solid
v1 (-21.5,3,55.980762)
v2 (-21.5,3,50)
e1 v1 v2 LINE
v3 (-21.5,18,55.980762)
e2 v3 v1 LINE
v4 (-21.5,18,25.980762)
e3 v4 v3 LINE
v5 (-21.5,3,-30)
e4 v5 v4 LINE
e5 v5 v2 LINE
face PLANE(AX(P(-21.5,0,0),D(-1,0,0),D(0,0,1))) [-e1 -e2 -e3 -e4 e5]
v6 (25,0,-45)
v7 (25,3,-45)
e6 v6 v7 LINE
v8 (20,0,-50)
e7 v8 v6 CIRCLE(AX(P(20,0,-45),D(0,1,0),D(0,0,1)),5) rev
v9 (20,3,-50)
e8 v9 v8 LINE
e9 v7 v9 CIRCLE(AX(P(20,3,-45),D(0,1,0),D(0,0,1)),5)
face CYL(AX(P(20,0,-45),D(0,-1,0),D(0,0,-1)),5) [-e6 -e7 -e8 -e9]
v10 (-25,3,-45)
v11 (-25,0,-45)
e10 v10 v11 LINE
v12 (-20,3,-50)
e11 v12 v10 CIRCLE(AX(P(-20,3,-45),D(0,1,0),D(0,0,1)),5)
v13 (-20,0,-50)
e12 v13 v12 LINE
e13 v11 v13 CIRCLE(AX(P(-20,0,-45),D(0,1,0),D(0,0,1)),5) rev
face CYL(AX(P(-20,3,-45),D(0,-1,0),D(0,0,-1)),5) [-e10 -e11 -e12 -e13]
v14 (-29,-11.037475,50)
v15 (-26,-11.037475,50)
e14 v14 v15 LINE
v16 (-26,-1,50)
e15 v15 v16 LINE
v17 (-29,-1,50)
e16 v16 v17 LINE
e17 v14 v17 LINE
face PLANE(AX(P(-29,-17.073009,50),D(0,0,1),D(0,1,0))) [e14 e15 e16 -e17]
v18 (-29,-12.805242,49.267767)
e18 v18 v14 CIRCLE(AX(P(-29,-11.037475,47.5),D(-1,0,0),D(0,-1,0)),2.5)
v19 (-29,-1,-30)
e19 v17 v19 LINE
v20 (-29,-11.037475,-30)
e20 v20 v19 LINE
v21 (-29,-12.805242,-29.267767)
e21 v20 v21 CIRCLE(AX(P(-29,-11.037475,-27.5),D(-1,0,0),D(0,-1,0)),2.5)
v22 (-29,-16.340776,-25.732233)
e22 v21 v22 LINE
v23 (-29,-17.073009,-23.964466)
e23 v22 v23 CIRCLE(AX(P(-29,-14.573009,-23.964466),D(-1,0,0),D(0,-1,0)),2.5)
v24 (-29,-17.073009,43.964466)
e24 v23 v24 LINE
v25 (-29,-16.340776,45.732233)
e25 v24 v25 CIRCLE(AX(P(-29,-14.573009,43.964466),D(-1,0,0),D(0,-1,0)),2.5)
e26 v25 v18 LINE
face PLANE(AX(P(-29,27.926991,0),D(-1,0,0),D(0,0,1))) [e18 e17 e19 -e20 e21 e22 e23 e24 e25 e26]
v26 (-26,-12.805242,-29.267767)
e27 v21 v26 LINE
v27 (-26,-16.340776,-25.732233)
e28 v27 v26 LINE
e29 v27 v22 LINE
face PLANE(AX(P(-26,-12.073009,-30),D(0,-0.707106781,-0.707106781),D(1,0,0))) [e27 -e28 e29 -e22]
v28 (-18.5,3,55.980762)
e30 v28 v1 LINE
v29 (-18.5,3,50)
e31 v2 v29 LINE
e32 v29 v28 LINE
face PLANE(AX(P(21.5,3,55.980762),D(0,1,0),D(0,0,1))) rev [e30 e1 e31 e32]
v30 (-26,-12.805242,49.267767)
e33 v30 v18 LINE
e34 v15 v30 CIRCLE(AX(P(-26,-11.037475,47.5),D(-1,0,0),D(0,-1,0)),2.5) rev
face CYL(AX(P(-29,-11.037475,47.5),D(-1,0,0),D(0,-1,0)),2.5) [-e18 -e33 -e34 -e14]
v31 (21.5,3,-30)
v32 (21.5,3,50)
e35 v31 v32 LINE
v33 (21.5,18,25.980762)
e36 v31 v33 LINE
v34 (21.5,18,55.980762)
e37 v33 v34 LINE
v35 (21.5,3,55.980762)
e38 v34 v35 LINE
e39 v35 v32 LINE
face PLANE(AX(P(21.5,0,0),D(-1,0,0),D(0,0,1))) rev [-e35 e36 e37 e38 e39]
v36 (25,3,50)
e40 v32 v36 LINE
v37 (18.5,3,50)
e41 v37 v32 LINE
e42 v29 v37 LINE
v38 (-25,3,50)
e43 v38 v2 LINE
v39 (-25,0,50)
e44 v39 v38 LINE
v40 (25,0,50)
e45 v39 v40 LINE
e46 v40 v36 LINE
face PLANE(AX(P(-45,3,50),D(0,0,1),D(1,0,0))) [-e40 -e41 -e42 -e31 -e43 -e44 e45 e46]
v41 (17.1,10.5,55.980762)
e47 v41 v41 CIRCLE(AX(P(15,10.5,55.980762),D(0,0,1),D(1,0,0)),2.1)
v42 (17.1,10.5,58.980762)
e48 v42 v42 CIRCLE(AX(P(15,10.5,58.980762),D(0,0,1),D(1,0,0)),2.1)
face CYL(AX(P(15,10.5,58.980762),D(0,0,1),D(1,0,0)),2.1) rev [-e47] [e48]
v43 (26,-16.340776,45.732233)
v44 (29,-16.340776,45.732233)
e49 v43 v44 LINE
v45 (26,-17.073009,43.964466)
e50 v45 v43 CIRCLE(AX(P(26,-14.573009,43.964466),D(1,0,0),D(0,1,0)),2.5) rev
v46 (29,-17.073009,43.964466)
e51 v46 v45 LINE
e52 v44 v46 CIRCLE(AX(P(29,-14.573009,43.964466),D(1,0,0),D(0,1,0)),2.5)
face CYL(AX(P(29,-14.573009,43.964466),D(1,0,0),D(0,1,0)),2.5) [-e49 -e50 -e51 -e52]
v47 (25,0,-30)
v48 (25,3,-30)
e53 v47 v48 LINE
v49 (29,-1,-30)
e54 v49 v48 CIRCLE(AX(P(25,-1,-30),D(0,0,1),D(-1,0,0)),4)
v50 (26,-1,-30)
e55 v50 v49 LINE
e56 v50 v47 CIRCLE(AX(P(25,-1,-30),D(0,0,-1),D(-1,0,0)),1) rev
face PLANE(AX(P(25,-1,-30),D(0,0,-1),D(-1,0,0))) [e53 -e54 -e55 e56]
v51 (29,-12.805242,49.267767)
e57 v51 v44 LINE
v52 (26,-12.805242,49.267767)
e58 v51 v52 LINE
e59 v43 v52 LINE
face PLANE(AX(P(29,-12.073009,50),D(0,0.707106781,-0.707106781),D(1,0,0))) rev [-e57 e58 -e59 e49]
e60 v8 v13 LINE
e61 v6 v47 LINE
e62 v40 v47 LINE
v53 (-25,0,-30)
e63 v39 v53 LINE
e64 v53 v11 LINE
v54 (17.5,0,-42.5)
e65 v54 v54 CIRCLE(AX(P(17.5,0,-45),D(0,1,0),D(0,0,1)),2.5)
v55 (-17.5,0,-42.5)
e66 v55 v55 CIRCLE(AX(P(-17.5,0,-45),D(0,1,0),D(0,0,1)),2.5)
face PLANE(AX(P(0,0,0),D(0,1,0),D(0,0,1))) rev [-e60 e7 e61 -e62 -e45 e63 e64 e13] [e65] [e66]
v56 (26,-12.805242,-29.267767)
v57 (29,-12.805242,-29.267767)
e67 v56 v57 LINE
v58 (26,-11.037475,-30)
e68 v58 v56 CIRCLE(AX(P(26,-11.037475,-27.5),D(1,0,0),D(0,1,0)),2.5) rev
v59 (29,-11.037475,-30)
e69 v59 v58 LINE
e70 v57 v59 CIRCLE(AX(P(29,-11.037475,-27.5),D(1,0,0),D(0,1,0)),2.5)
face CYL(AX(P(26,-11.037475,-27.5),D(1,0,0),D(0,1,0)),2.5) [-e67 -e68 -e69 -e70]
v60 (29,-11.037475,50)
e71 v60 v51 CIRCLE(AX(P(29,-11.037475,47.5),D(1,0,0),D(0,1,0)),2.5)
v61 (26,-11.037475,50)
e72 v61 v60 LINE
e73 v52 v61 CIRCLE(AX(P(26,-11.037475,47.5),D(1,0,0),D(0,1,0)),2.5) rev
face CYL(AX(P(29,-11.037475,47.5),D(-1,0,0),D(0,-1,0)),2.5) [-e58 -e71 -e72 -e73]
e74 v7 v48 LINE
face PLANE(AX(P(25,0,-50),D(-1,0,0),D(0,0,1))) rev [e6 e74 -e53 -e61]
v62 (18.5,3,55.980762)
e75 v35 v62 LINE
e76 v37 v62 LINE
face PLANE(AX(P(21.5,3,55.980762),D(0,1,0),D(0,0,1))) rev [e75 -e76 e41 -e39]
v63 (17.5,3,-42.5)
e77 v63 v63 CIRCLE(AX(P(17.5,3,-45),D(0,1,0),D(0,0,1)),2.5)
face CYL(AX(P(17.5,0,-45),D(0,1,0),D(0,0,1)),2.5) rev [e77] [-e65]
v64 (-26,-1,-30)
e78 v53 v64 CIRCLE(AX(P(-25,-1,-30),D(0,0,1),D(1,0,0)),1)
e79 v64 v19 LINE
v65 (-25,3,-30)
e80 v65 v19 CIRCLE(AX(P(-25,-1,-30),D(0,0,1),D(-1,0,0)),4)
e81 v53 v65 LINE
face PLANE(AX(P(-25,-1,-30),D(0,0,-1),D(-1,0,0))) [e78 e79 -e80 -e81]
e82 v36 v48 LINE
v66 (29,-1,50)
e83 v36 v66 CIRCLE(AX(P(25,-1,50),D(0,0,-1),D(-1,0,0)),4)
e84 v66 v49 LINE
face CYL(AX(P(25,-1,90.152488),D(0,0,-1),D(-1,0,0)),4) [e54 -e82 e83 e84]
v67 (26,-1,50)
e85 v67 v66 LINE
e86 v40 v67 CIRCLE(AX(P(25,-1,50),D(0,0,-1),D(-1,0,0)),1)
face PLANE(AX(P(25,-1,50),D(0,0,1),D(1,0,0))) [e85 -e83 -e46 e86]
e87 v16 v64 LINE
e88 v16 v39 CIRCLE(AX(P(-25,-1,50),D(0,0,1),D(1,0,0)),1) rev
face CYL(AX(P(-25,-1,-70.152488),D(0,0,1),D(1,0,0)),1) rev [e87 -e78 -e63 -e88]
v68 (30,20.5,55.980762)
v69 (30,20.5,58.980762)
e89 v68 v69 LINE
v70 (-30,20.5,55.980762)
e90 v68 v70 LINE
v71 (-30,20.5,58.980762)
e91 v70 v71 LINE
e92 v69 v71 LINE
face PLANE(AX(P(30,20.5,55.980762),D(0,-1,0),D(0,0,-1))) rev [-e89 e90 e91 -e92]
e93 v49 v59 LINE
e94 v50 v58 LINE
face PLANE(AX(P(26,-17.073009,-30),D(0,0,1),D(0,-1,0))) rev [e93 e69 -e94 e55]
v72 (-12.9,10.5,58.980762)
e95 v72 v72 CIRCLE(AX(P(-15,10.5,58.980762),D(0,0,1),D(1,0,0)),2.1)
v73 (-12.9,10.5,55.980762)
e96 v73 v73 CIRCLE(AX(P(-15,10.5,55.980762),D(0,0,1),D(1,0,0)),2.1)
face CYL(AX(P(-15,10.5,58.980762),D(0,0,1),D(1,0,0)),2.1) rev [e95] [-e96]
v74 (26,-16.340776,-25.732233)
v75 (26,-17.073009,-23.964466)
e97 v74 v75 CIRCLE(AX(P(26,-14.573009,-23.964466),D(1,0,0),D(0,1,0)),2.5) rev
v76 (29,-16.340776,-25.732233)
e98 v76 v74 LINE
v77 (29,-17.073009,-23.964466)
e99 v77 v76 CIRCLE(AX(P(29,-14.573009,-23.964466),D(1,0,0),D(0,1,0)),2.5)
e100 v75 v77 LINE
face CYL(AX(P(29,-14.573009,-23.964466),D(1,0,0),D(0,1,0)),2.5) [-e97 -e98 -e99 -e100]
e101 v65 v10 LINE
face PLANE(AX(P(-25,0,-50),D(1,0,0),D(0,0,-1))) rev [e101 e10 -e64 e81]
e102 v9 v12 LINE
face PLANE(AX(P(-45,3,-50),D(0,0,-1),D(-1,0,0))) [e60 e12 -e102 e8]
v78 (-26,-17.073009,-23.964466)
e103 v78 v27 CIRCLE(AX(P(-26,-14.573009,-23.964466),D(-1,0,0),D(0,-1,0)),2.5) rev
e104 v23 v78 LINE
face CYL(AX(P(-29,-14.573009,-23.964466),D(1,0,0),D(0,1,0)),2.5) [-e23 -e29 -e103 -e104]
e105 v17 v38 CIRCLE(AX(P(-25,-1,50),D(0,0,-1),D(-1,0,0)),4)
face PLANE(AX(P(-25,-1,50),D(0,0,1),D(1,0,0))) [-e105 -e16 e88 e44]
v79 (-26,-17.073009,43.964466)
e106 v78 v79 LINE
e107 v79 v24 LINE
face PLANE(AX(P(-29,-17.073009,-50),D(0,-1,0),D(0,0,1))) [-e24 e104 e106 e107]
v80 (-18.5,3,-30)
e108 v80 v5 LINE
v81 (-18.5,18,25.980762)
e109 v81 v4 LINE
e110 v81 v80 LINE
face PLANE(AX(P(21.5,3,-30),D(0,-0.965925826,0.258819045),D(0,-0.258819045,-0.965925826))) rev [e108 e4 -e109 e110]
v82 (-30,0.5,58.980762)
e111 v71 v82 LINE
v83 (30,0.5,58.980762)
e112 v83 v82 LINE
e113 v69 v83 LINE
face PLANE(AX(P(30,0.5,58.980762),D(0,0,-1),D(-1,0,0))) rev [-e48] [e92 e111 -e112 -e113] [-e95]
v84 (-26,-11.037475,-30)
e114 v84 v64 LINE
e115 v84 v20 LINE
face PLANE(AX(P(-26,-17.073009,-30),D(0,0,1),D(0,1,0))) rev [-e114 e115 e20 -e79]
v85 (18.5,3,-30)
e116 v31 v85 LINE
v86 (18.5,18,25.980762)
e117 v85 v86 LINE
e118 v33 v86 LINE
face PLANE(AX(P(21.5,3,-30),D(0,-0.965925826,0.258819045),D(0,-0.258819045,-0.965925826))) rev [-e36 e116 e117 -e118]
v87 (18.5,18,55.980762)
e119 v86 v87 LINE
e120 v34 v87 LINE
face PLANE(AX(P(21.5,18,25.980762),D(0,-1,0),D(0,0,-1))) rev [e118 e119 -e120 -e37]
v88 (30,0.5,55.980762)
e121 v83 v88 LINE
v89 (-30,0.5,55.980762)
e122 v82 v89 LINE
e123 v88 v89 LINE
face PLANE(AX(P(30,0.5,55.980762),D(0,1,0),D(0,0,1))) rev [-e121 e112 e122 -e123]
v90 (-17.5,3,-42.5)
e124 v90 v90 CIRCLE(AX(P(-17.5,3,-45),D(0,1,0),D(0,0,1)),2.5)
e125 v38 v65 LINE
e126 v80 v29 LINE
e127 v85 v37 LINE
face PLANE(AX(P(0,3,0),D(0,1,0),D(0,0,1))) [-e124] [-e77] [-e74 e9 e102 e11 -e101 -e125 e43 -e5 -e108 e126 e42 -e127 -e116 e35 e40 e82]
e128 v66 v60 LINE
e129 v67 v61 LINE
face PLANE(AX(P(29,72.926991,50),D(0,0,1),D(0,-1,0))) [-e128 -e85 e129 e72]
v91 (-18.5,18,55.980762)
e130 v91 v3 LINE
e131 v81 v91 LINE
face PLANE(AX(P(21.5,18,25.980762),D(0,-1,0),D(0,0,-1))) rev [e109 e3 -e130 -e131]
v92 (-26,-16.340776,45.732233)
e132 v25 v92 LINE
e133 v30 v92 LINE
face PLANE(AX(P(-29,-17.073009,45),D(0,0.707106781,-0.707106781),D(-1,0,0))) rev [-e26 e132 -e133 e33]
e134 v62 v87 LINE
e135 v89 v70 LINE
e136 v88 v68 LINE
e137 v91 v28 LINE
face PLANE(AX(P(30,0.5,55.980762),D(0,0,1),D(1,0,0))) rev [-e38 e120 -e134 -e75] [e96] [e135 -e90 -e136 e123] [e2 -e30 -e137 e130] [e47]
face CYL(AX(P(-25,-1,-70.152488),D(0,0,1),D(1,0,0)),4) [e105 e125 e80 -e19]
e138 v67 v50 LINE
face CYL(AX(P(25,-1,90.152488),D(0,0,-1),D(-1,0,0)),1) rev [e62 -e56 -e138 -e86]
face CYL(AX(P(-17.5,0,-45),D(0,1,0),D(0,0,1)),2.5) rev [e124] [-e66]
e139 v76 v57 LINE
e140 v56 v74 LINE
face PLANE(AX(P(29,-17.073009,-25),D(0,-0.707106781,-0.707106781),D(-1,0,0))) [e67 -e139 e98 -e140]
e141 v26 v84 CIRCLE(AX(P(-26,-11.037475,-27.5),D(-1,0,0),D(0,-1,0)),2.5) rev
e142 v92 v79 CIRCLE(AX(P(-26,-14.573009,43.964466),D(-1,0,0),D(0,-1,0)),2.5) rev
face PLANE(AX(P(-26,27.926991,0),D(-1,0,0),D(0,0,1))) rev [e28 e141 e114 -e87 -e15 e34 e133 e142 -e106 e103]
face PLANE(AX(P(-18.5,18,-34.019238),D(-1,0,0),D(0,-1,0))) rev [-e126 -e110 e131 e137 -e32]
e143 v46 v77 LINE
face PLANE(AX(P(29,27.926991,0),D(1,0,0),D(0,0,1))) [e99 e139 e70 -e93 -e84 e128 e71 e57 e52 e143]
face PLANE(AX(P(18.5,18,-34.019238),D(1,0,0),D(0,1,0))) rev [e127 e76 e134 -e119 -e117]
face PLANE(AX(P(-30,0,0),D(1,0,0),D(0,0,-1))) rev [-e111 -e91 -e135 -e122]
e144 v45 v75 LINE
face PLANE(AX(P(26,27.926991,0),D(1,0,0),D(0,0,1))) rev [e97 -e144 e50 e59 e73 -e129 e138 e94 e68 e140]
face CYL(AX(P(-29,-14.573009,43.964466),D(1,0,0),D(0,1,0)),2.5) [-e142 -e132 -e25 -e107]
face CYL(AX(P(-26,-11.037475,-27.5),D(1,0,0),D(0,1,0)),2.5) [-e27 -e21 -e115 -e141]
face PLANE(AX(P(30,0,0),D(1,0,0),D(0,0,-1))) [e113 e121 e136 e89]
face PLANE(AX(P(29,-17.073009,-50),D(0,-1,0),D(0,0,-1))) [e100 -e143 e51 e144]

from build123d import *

# Parameters (mm, degrees)
ESBO_O1_W                 = 90
ESBO_O1_H                 = 100
RESSALTO_EXTRUS_O1_DEPTH  = 3
ESBO_O4_W                 = 20
ESBO_O4_H                 = 20
CORTE_EXTRUS_O1_DEPTH     = 3
DOBRA_START               = -30
DOBRA_ESBO_ADA1_DEPTH     = 80
DOBRA_ESBO_ADA1_2_DEPTH   = 80
DOBRA_ESBO_ADA2_DEPTH     = 80
DOBRA_ESBO_ADA2_2_DEPTH   = 80
FILETE1_R                 = 5
CHANFRO1_SIZE             = 5
FILETE2_R                 = 2.5
ESBO_O7_R                 = 2.5
CORTE_EXTRUS_O2_DEPTH     = 3
RESSALTO_EXTRUS_O2_DEPTH  = 21.5
ESBO_O9_W                 = 37
ESBO_O9_H                 = 15
CORTE_EXTRUS_O7_DEPTH     = 90
ESBO_O10_W                = 3
ESBO_O10_H                = 20
RESSALTO_EXTRUS_O3_DEPTH  = 30
FURO_ROSCADO_DE_M51_D     = 4.2
FURO_ROSCADO_DE_M51_DEPTH = 14
FURO_ROSCADO_DE_M51_TIP   = 1.2618073


# Read off the part's stored shape, not the designer's step: Dobra esboçada1, Dobra esboçada2
with BuildPart() as part:
    # Esboço1 → Ressalto-extrusão1 (new body)
    with BuildSketch(Plane(origin=(0, 0, 0), x_dir=(1, 0, 0), z_dir=(0, 1, 0))):
        Rectangle(ESBO_O1_W, ESBO_O1_H)
    extrude(amount=RESSALTO_EXTRUS_O1_DEPTH)

    # Esboço4 → Corte-extrusão1 (cut)
    with BuildSketch(Plane(origin=(0, 3, 0), x_dir=(1, 0, 0), z_dir=(0, 1, 0))):
        with Locations((-35, 40)):
            Rectangle(ESBO_O4_W, ESBO_O4_H)
        with Locations((35, 40)):
            Rectangle(ESBO_O4_W, ESBO_O4_H)
    extrude(amount=-CORTE_EXTRUS_O1_DEPTH, mode=Mode.SUBTRACT)

    # Dobra esboçada1 outline → Dobra esboçada1 (cut)
    with BuildSketch(Plane.XY.offset(DOBRA_START)):
        with BuildLine():
            Line((-45, 0), (-28.872983346, 0))
            ThreePointArc((-28.872983346, 0), (-27.449489743, 2.16227766), (-25, 3))
            Line((-25, 3), (-45, 3))
            Line((-45, 3), (-45, 0))
        make_face()
    extrude(amount=DOBRA_ESBO_ADA1_DEPTH, mode=Mode.SUBTRACT)

    # Dobra esbo_ada1 2 outline → Dobra esbo_ada1 2 (add)
    with BuildSketch(Plane.XY.offset(DOBRA_START)):
        with BuildLine():
            ThreePointArc((-28.872983346, 0), (-28.968118785, -0.49598283), (-29, -1))
            Line((-29, -1), (-29, -17.073009183))
            Line((-29, -17.073009183), (-26, -17.073009183))
            Line((-26, -17.073009183), (-26, -1))
            ThreePointArc((-26, -1), (-25.707106781, -0.292893219), (-25, 0))
            Line((-25, 0), (-28.872983346, 0))
        make_face()
    extrude(amount=DOBRA_ESBO_ADA1_2_DEPTH)

    # Dobra esboçada2 outline → Dobra esboçada2 (cut)
    with BuildSketch(Plane.XY.offset(DOBRA_START)):
        with BuildLine():
            ThreePointArc((25, 3), (27.449489743, 2.16227766), (28.872983346, 0))
            Line((28.872983346, 0), (45, 0))
            Line((45, 0), (45, 3))
            Line((45, 3), (25, 3))
        make_face()
    extrude(amount=DOBRA_ESBO_ADA2_DEPTH, mode=Mode.SUBTRACT)

    # Dobra esbo_ada2 2 outline → Dobra esbo_ada2 2 (add)
    with BuildSketch(Plane.XY.offset(DOBRA_START)):
        with BuildLine():
            Line((26, -1), (26, -17.073009183))
            Line((26, -17.073009183), (29, -17.073009183))
            Line((29, -17.073009183), (29, -1))
            ThreePointArc((29, -1), (28.968118785, -0.49598283), (28.872983346, 0))
            Line((28.872983346, 0), (25, 0))
            ThreePointArc((25, 0), (25.707106781, -0.292893219), (26, -1))
        make_face()
    extrude(amount=DOBRA_ESBO_ADA2_2_DEPTH)

    # Filete1
    filete1_edges = [part.edges().sort_by_distance(p)[0] for p in [
        (-25, 1.5, -50),
        (25, 1.5, -50),
    ]]
    fillet(filete1_edges, radius=FILETE1_R)

    # Chanfro1
    chanfro1_edges = [part.edges().sort_by_distance(p)[0] for p in [
        (27.5, -17.073009183, -30),
        (27.5, -17.073009183, 50),
        (-27.5, -17.073009183, -30),
        (-27.5, -17.073009183, 50),
    ]]
    chamfer(chanfro1_edges, length=CHANFRO1_SIZE)

    # Filete2
    filete2_edges = [part.edges().sort_by_distance(p)[0] for p in [
        (27.5, -12.073009183, 50),
        (27.5, -17.073009183, -25),
        (27.5, -17.073009183, 45),
        (-27.5, -17.073009183, -25),
        (-27.5, -17.073009183, 45),
        (-27.5, -12.073009183, 50),
        (27.5, -12.073009183, -30),
        (-27.5, -12.073009183, -30),
    ]]
    fillet(filete2_edges, radius=FILETE2_R)

    # Esboço7 → Corte-extrusão2 (cut)
    with BuildSketch(Plane(origin=(0, 3, 0), x_dir=(1, 0, 0), z_dir=(0, 1, 0))):
        with Locations(Location((-17.5, 45, 0), (0, 0, 270))):
            Circle(ESBO_O7_R)
        with Locations(Location((17.5, 45, 0), (0, 0, 270))):
            Circle(ESBO_O7_R)
    extrude(amount=-CORTE_EXTRUS_O2_DEPTH, mode=Mode.SUBTRACT)

    # Esboço8 → Ressalto-extrusão2 (add, symmetric)
    with BuildSketch(Plane(origin=(0, 0, 0), x_dir=(0, 0, -1), z_dir=(1, 0, 0))):
        Polygon((30, 3), (-25.980762114, 18), (-55.980762114, 18), (-55.980762114, 3), align=None)
    extrude(amount=RESSALTO_EXTRUS_O2_DEPTH, both=True)

    # Esboço9 → Corte-extrusão7 (cut)
    with BuildSketch(Plane.XY.offset(55.980762114)):
        with Locations((0, 10.5)):
            Rectangle(ESBO_O9_W, ESBO_O9_H)
    extrude(amount=-CORTE_EXTRUS_O7_DEPTH, mode=Mode.SUBTRACT)

    # Esboço10 → Ressalto-extrusão3 (add, symmetric)
    with BuildSketch(Plane(origin=(0, 0, 0), x_dir=(0, 0, -1), z_dir=(1, 0, 0))):
        with Locations((-57.480762114, 10.5)):
            Rectangle(ESBO_O10_W, ESBO_O10_H)
    extrude(amount=RESSALTO_EXTRUS_O3_DEPTH, both=True)

    # Furo roscado de M51
    with Locations(Plane.XY.offset(58.980762114)):
        with Locations((-15, 10.5), (15, 10.5)):
            Hole(FURO_ROSCADO_DE_M51_D / 2, depth=FURO_ROSCADO_DE_M51_DEPTH)
            with Locations((0, 0, -(FURO_ROSCADO_DE_M51_DEPTH + FURO_ROSCADO_DE_M51_TIP / 2))):  # 118° drill point
                Cone(0, FURO_ROSCADO_DE_M51_D / 2, FURO_ROSCADO_DE_M51_TIP, mode=Mode.SUBTRACT)


solid = part.part
